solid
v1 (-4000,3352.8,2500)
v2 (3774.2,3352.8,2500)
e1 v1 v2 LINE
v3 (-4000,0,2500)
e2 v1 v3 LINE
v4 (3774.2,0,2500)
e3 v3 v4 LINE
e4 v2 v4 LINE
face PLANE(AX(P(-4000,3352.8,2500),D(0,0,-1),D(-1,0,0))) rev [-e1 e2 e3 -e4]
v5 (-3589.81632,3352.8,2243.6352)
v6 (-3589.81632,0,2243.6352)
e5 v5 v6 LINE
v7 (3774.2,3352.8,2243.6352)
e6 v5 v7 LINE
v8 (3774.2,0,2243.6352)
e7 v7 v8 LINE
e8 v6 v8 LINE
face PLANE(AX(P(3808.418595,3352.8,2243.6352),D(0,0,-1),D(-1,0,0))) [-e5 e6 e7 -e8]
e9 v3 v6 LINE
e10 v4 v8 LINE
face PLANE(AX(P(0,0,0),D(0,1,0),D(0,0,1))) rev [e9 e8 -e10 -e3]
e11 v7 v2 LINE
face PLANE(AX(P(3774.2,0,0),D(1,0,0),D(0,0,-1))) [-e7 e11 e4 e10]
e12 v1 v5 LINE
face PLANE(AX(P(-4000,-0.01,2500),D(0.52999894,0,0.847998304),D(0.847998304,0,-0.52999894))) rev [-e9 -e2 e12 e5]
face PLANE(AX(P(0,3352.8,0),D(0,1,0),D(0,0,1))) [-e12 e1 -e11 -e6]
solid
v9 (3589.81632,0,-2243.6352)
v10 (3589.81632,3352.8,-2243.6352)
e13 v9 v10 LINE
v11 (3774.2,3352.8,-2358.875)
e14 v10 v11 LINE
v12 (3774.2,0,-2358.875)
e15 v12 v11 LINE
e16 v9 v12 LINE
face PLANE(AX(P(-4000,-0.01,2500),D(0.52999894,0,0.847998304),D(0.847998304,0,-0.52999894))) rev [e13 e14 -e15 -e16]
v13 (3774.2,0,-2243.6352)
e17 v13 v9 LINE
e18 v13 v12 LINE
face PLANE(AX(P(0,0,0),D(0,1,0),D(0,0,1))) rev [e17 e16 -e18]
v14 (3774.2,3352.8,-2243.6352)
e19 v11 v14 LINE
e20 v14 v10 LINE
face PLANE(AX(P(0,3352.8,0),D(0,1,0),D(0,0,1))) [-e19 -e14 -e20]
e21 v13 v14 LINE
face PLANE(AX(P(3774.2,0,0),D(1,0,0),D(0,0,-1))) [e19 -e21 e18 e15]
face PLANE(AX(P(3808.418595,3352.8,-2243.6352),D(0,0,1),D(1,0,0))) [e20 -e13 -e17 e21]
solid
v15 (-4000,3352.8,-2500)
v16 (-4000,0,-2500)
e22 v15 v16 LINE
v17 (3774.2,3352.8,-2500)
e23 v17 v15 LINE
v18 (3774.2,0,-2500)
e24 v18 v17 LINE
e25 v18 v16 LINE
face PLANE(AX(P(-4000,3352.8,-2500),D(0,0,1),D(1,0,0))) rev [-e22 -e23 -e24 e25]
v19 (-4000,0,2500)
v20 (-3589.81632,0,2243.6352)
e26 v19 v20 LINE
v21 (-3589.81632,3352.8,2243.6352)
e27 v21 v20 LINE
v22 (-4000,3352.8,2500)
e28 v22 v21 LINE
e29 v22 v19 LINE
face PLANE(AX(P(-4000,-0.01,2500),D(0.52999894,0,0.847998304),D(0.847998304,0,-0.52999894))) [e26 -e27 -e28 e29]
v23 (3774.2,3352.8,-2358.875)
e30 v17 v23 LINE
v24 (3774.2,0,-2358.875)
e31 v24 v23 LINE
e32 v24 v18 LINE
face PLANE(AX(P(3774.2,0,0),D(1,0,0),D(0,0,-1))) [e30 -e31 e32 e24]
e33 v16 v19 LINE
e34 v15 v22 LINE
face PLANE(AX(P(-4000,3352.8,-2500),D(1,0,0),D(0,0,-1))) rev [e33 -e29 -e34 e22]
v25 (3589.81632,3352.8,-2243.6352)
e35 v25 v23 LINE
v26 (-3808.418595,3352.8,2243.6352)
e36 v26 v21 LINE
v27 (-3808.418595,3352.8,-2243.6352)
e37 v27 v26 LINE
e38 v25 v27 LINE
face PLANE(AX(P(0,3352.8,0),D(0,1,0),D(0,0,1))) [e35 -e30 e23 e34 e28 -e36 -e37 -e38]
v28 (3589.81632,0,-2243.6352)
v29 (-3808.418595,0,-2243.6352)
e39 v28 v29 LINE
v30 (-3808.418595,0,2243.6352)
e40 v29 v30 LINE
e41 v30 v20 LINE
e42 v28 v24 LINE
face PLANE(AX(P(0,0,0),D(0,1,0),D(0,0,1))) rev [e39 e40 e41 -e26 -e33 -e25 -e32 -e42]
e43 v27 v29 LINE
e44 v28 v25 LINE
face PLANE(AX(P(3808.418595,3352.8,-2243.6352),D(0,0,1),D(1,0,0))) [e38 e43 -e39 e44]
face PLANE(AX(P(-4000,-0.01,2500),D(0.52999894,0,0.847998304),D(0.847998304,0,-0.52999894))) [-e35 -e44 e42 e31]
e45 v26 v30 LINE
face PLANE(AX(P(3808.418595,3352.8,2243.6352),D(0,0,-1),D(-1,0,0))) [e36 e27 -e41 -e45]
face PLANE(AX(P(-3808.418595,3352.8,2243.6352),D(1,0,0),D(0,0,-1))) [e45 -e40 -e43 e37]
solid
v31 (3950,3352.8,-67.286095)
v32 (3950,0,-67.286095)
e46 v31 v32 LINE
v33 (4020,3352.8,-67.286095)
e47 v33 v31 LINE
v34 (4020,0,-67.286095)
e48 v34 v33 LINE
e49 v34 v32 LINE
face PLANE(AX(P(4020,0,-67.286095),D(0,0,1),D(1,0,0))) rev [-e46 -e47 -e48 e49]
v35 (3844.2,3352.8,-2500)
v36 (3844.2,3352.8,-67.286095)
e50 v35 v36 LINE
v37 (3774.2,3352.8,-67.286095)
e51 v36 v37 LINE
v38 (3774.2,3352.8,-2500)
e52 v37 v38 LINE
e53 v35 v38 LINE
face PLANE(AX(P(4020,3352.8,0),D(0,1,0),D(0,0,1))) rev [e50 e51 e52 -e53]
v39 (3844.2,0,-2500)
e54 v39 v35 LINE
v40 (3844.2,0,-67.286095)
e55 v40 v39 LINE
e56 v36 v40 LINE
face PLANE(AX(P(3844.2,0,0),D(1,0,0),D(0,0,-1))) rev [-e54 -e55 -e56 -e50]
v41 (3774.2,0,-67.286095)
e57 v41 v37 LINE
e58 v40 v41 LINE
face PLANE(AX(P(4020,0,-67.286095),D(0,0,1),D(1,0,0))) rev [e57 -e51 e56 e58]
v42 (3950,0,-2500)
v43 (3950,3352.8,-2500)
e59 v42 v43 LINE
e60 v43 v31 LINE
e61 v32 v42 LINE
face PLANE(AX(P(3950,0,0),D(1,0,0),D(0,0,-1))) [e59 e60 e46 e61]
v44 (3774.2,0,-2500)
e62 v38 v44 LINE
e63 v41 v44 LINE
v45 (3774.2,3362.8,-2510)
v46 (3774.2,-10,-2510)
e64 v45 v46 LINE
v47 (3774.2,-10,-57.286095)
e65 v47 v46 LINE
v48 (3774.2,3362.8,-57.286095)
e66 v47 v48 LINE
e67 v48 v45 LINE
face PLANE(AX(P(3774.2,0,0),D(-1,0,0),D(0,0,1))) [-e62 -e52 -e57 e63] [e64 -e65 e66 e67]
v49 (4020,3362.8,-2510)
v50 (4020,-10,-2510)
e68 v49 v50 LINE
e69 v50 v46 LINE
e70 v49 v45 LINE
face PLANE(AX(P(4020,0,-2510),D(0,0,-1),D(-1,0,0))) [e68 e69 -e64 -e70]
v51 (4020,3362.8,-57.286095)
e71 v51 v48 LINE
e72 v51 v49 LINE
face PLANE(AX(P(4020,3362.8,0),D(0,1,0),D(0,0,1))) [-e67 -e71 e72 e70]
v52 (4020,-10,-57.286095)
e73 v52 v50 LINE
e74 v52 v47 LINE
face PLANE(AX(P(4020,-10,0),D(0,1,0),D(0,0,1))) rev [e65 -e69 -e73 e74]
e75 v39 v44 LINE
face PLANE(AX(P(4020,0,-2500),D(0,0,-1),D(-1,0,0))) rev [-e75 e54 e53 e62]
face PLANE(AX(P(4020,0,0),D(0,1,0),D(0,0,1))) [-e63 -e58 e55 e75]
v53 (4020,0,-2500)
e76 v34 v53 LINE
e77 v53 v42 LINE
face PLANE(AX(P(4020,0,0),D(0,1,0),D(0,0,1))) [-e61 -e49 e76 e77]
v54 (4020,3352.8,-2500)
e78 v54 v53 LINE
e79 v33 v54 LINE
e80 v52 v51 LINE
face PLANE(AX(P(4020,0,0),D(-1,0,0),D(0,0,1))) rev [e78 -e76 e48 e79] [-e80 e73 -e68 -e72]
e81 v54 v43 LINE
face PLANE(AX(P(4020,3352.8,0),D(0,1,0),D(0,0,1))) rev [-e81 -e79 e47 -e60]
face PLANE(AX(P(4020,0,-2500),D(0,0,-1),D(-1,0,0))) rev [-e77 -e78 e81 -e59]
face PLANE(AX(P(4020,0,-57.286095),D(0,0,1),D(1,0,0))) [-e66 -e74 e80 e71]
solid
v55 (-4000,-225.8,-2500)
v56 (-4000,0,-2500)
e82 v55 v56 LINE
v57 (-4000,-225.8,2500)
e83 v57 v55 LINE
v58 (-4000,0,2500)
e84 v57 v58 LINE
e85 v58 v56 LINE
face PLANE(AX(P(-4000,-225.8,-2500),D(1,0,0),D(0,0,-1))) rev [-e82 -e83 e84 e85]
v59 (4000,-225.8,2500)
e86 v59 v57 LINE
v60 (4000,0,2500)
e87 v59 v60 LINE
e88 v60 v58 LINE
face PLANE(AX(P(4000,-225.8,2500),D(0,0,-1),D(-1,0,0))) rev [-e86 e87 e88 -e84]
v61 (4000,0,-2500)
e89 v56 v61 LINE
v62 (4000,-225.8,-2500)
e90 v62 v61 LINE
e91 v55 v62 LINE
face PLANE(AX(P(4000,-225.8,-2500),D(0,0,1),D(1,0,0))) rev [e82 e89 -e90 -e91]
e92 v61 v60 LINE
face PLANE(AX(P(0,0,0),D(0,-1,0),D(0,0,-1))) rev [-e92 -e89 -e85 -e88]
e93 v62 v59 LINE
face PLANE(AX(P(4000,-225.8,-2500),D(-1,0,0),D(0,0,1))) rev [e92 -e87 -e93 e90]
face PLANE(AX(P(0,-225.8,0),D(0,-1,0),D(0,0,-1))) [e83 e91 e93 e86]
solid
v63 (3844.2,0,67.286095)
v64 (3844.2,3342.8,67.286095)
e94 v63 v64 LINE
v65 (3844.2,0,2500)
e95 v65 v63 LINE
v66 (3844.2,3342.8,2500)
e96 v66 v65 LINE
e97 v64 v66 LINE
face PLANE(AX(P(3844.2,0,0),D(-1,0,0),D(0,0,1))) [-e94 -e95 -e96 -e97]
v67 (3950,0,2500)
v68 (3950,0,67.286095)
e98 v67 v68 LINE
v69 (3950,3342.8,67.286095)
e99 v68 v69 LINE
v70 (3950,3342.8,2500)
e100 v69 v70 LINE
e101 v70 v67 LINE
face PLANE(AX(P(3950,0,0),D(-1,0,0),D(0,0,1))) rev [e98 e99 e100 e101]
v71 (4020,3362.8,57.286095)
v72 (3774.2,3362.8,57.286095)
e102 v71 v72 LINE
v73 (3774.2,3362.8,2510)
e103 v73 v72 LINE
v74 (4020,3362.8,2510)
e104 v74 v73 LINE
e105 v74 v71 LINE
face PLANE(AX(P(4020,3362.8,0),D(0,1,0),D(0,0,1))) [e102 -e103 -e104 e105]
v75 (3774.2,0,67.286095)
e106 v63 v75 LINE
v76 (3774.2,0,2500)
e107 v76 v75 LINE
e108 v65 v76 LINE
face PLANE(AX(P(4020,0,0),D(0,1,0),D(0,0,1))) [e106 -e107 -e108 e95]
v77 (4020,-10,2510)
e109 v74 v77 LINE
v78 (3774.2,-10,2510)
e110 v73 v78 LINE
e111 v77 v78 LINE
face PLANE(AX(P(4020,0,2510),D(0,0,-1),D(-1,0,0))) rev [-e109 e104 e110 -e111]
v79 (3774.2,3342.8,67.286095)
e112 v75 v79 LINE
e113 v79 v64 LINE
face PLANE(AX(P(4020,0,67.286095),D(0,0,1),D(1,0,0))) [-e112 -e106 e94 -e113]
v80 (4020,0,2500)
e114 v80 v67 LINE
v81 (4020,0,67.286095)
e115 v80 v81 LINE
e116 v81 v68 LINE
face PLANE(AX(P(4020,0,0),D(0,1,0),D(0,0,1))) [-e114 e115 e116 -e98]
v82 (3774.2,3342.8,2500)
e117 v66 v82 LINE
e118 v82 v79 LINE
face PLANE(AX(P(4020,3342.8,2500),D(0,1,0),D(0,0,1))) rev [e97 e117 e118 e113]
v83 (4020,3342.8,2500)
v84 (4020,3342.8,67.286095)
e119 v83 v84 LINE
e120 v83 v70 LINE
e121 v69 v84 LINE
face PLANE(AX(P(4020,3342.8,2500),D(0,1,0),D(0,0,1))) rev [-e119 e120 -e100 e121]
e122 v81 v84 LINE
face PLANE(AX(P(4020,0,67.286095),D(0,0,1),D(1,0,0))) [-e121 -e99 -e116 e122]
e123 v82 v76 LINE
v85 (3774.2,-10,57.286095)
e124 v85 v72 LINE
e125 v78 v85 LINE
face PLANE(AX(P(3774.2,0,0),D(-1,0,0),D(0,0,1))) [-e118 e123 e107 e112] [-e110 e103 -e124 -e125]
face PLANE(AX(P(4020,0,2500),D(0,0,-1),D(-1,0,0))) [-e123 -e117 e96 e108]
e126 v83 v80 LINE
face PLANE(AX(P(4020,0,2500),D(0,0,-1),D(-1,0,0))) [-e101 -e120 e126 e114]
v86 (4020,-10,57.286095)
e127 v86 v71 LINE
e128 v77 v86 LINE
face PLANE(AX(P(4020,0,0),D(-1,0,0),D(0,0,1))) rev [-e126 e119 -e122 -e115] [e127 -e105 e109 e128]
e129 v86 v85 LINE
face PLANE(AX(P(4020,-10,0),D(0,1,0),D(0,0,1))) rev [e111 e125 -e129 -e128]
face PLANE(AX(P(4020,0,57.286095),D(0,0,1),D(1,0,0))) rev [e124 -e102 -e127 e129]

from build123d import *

# Parameters (mm, degrees)
SKETCH1_W                 = 8000
SKETCH1_H                 = 5000
SKETCH1_W_2               = 7616.83718919
SKETCH1_H_2               = 4487.2704
BOSS_EXTRUDE1_DEPTH       = 3352.8
SPLIT1_SURFACE_1_BACK     = 10013.056
SPLIT1_SURFACE_1_DEPTH    = 20026.112
SPLIT1_SURFACE_2_BACK     = 10013.056
SPLIT1_SURFACE_2_DEPTH    = 20026.112
SKETCH3_W                 = 8000
SKETCH3_H                 = 5000
BOSS_EXTRUDE2_DEPTH       = 225.8
SKETCH4_W                 = 5000
SKETCH4_H                 = 3352.8
CUT_EXTRUDE1_DEPTH        = 225.8
EXTRUDE_THIN4_OUTLINE_W   = 2432.713905463
EXTRUDE_THIN4_OUTLINE_H   = 3342.8
EXTRUDE_THIN4_OUTLINE_H_2 = 3352.8
EXTRUDE_THIN4_DEPTH       = 245.8
SKETCH6_W                 = 2432.713905463
SKETCH6_H                 = 3342.8
SKETCH6_H_2               = 3352.8
BOSS_EXTRUDE3_DEPTH       = 52.9


# Read off the part's stored shape, not the designer's step: Extrude-Thin4
with BuildPart() as part:
    # Sketch1 → Boss-Extrude1 (new body)
    with BuildSketch(Plane(origin=(0, 0, 0), x_dir=(1, 0, 0), z_dir=(0, 1, 0))):
        Rectangle(SKETCH1_W, SKETCH1_H)
        Rectangle(SKETCH1_W_2, SKETCH1_H_2, mode=Mode.SUBTRACT)
    extrude(amount=BOSS_EXTRUDE1_DEPTH)


with BuildPart() as body_2:
    # Split1: the piece behind the surface
    add(part.part)
    # Split1 surface: a surface, the sketch's curves swept straight by 20026.112 mm
    with BuildLine(Plane(origin=(0, 3352.8, 0), x_dir=(1, 0, 0), z_dir=(0, 1, 0)).offset(-SPLIT1_SURFACE_1_BACK), mode=Mode.PRIVATE) as split1_surface_1_path:
        Line((-4000, -2500), (4000, 2500))
    split1_surface_1 = Shell.extrude(split1_surface_1_path.wire(), (0 * SPLIT1_SURFACE_1_DEPTH, 1 * SPLIT1_SURFACE_1_DEPTH, 0 * SPLIT1_SURFACE_1_DEPTH))
    split(bisect_by=split1_surface_1, keep=Keep.BOTTOM)


with BuildPart() as part_1:
    add(part.part)

    # Split1: split by a surface, the side it looks to stays
    # Split1 surface: a surface, the sketch's curves swept straight by 20026.112 mm
    with BuildLine(Plane(origin=(0, 3352.8, 0), x_dir=(1, 0, 0), z_dir=(0, 1, 0)).offset(-SPLIT1_SURFACE_2_BACK), mode=Mode.PRIVATE) as split1_surface_2_path:
        Line((-4000, -2500), (4000, 2500))
    split1_surface_2 = Shell.extrude(split1_surface_2_path.wire(), (0 * SPLIT1_SURFACE_2_DEPTH, 1 * SPLIT1_SURFACE_2_DEPTH, 0 * SPLIT1_SURFACE_2_DEPTH))
    split(bisect_by=split1_surface_2, keep=Keep.TOP)


with BuildPart() as body_3:
    # Sketch3 → Boss-Extrude2 (new body)
    with BuildSketch(Plane.XZ):
        Rectangle(SKETCH3_W, SKETCH3_H)
    extrude(amount=BOSS_EXTRUDE2_DEPTH)


with BuildPart() as cut_extrude1_tool:
    # Sketch4 → Cut-Extrude1 (new body)
    with BuildSketch(Plane(origin=(4000, 0, 0), x_dir=(0, 0, -1), z_dir=(1, 0, 0))):
        with Locations((0, 1676.4)):
            Rectangle(SKETCH4_W, SKETCH4_H)
    extrude(amount=-CUT_EXTRUDE1_DEPTH)


with BuildPart() as part_2:
    add(part_1.part)

    # Cut-Extrude1: cut by cut_extrude1_tool
    add(cut_extrude1_tool.part, mode=Mode.SUBTRACT)


with BuildPart() as body_2_1:
    add(body_2.part)

    # Cut-Extrude1: cut by cut_extrude1_tool
    add(cut_extrude1_tool.part, mode=Mode.SUBTRACT)


with BuildPart() as body_4:
    # Extrude-Thin4 outline → Extrude-Thin4 (new body)
    # profile 1 of 2: a face of its own
    with BuildSketch(Plane(origin=(3774.2, 0, 0), x_dir=(0, 0, -1), z_dir=(1, 0, 0))):
        Polygon((-57.286094537, -10), (-57.286094537, 0), (-57.286094537, 3362.8), (-2510, 3362.8), (-2510, -10), align=None)
        with Locations((-1283.643047268, 1671.4)):
            Rectangle(EXTRUDE_THIN4_OUTLINE_W, EXTRUDE_THIN4_OUTLINE_H, mode=Mode.SUBTRACT)
    # profile 2 of 2: a face of its own
    with BuildSketch(Plane(origin=(3774.2, 0, 0), x_dir=(0, 0, -1), z_dir=(1, 0, 0))):
        Polygon((57.286094537, 3362.8), (57.286094537, 0), (57.286094537, -10), (2510, -10), (2510, 3362.8), align=None)
        with Locations((1283.643047268, 1676.4)):
            Rectangle(EXTRUDE_THIN4_OUTLINE_W, EXTRUDE_THIN4_OUTLINE_H_2, mode=Mode.SUBTRACT)
    extrude(amount=EXTRUDE_THIN4_DEPTH)

    # Sketch6 → Boss-Extrude3 (add, symmetric)
    with BuildSketch(Plane(origin=(3897.1, 0, 0), x_dir=(0, 0, -1), z_dir=(1, 0, 0))):
        with Locations((-1283.643047268, 1671.4)):
            Rectangle(SKETCH6_W, SKETCH6_H)
        with Locations((1283.643047268, 1676.4)):
            Rectangle(SKETCH6_W, SKETCH6_H_2)
    extrude(amount=BOSS_EXTRUDE3_DEPTH, both=True)


solid = Compound([body_3.part, part_2.part, body_2_1.part, body_4.part])
